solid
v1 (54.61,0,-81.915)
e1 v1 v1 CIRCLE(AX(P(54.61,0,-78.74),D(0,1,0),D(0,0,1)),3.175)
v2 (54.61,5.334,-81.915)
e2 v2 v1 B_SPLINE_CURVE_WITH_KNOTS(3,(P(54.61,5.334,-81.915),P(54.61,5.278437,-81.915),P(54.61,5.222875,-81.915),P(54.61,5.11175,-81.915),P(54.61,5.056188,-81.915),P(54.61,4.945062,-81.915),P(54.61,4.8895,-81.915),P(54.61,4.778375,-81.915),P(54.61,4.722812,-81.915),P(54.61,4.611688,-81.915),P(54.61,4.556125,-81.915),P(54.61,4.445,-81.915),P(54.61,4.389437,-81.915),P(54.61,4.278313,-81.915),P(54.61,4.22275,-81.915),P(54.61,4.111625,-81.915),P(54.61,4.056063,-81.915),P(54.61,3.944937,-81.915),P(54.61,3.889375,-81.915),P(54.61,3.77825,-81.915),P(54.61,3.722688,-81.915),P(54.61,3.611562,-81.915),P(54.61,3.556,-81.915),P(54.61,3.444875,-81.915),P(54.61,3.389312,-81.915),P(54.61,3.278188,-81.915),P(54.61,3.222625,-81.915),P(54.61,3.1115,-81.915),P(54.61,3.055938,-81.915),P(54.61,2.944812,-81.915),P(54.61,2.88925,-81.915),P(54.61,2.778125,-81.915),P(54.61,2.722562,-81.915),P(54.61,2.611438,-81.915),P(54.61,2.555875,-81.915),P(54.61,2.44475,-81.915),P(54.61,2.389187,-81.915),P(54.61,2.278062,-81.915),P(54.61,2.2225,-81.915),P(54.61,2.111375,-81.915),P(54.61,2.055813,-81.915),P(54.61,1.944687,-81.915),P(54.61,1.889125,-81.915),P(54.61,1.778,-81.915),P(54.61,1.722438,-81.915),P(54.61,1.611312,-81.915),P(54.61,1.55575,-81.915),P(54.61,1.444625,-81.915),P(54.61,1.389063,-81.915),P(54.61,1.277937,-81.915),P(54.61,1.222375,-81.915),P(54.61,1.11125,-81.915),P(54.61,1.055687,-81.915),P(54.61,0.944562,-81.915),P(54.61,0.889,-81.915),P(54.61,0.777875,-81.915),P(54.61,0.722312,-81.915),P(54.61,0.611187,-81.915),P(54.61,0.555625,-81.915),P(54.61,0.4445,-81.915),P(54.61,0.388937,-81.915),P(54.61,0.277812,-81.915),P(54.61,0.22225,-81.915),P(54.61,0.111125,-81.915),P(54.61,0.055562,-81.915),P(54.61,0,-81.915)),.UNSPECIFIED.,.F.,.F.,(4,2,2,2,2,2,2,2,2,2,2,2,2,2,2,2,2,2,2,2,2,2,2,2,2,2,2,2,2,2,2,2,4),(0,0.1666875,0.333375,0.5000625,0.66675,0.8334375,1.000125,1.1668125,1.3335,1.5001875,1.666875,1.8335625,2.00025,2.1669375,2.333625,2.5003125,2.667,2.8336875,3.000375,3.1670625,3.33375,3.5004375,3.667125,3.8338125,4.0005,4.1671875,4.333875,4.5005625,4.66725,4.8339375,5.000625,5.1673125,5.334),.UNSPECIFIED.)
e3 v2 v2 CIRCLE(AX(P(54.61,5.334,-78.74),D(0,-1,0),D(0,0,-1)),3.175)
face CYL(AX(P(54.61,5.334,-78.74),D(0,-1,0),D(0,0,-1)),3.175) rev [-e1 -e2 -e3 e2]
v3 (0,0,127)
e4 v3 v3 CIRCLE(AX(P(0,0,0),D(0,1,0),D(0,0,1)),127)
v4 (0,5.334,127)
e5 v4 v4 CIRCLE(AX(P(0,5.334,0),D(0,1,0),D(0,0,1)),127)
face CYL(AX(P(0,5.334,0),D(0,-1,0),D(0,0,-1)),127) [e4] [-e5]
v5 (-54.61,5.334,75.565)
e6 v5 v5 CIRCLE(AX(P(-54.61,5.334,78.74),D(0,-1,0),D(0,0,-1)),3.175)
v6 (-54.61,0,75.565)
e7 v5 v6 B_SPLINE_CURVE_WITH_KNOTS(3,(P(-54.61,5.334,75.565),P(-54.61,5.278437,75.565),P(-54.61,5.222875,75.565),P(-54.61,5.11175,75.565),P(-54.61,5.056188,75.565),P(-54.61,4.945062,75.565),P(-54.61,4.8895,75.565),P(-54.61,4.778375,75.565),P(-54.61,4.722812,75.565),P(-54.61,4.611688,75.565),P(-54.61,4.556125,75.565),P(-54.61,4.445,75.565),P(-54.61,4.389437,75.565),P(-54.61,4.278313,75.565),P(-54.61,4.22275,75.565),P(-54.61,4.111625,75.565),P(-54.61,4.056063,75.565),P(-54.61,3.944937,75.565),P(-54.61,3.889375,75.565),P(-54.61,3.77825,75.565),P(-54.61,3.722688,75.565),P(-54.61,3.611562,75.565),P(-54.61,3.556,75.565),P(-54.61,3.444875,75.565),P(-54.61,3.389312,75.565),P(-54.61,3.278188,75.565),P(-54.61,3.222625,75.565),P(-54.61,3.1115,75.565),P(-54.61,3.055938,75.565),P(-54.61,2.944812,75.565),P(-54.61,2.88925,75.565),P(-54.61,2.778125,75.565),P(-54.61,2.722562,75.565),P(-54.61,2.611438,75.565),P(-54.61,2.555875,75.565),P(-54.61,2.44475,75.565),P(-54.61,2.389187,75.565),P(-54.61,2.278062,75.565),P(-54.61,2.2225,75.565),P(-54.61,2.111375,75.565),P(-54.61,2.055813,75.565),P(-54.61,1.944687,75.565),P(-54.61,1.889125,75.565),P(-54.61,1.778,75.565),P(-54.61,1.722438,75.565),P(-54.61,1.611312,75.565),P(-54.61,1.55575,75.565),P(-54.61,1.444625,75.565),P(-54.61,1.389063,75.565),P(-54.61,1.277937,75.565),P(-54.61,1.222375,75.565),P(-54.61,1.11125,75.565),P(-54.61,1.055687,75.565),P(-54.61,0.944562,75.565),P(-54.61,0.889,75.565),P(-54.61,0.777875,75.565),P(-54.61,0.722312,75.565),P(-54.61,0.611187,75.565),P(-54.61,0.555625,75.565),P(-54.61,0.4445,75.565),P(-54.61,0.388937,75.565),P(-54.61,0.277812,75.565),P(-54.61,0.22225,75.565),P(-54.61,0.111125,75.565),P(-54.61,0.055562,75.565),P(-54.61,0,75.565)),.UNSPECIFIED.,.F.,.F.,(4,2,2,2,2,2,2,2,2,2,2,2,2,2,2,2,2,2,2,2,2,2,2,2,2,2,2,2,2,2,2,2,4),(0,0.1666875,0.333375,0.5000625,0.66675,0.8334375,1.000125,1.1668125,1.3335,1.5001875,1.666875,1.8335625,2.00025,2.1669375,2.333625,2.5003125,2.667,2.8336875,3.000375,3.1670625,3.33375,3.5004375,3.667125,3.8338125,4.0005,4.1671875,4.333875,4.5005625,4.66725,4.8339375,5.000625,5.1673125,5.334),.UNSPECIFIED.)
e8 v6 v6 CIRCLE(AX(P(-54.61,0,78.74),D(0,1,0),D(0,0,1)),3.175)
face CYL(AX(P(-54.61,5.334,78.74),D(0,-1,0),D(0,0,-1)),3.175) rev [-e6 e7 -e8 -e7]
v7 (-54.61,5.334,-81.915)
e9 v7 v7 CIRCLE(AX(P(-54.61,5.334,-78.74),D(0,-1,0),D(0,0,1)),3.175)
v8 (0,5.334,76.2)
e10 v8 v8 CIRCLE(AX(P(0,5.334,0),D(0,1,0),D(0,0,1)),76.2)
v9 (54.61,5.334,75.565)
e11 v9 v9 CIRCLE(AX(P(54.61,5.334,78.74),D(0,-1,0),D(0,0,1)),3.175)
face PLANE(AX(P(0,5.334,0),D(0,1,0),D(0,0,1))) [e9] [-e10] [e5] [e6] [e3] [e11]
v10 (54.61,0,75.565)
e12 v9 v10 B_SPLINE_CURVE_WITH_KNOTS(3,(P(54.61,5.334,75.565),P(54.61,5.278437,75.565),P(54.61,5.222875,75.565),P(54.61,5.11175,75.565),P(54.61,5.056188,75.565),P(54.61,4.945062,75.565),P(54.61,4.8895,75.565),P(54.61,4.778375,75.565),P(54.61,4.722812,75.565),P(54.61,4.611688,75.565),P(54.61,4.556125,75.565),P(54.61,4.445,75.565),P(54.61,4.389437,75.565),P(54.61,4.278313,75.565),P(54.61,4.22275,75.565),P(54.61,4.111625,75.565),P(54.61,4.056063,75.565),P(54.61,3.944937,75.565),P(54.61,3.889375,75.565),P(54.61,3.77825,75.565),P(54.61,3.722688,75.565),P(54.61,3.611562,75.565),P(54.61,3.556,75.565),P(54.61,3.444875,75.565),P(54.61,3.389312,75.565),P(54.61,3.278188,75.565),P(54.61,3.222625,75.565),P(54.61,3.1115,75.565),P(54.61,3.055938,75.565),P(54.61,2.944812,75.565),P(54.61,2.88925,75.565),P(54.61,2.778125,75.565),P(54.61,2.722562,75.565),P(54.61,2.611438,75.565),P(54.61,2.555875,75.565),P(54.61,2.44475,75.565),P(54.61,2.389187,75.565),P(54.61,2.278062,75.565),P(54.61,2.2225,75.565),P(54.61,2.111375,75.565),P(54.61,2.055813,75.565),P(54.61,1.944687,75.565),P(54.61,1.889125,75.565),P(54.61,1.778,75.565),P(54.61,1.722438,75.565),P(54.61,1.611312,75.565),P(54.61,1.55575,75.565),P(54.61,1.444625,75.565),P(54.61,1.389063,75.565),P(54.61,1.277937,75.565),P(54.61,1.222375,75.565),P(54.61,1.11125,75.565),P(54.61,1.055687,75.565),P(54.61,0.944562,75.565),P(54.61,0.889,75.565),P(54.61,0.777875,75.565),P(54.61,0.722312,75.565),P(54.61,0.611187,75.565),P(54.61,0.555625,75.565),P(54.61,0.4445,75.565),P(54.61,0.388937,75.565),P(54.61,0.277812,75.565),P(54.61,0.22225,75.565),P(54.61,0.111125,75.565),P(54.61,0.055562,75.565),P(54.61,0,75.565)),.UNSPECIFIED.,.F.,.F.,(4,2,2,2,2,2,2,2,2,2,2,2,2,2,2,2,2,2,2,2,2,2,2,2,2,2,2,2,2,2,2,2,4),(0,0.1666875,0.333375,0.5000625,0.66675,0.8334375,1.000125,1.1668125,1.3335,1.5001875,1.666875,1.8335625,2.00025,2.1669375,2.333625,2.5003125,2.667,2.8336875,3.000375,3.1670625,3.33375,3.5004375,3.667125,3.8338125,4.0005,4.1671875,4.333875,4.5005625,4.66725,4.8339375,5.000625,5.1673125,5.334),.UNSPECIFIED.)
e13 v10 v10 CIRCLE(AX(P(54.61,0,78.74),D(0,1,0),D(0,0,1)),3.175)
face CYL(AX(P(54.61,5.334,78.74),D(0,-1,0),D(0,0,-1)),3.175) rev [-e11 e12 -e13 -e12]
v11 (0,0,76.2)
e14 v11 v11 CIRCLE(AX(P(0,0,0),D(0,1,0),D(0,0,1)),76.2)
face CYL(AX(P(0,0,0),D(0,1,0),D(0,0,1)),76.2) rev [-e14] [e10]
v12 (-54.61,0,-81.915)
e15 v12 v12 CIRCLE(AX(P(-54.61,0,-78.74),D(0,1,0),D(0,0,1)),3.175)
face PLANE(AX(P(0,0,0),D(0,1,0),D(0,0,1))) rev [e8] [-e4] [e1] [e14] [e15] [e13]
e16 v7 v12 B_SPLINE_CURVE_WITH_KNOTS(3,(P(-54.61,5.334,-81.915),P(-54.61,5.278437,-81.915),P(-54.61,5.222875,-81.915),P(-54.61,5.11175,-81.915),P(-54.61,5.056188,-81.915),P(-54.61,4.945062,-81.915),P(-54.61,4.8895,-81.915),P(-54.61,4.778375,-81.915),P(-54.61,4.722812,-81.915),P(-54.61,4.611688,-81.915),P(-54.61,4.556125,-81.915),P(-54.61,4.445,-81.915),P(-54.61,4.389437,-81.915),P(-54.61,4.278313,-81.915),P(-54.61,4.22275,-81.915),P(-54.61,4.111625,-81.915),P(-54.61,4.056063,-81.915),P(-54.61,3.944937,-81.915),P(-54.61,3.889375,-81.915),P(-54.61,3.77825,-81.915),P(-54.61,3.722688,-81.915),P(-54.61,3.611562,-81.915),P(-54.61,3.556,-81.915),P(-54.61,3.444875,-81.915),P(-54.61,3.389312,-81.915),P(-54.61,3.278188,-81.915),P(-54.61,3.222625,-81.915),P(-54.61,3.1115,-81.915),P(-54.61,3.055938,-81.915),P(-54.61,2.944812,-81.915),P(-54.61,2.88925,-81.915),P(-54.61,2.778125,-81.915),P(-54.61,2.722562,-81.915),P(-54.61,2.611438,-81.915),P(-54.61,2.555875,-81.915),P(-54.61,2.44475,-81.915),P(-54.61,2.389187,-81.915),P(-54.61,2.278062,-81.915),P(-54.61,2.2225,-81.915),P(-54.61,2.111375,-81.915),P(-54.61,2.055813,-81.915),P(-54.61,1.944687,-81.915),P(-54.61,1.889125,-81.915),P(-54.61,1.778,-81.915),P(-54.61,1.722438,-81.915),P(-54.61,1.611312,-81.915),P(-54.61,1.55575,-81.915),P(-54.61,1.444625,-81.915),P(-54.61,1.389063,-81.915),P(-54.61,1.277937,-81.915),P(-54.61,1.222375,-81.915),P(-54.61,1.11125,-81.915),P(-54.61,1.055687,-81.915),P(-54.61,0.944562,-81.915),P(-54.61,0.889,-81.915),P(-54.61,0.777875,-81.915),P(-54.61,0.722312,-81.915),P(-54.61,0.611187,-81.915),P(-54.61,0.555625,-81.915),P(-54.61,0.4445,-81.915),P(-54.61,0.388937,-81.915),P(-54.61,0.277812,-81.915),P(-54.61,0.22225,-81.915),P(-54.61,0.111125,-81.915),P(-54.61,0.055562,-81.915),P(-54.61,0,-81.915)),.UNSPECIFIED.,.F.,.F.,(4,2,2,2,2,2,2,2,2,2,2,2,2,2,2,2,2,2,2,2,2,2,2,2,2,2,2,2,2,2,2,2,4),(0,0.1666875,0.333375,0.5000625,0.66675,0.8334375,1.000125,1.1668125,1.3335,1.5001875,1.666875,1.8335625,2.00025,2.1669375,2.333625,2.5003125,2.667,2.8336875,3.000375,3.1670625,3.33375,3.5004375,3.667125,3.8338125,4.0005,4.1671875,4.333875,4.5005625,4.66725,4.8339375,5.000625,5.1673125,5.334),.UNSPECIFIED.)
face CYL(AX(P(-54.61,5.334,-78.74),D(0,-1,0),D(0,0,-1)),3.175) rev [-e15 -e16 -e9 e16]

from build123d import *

# Parameters (mm, degrees)
SKETCH1_R          = 127
BASE_DEPTH         = 5.334
SKETCH2_R          = 76.2
CUT_EXTRUDE1_DEPTH = 180.684310823
HOLE2_OUTLINE_R    = 3.175
HOLE2_DEPTH        = 5.334


# Read off the part's stored shape, not the designer's step: Hole2
with BuildPart() as part:
    # Sketch1 → Base (new body)
    with BuildSketch(Plane(origin=(0, 0, 0), x_dir=(1, 0, 0), z_dir=(0, 1, 0))):
        with Locations(Location((0, 0, 0), (0, 0, 270))):
            Circle(SKETCH1_R)
    extrude(amount=BASE_DEPTH)

    # Sketch2 → Cut-Extrude1 (cut, through all)
    with BuildSketch(Plane(origin=(0, 5.334, 0), x_dir=(1, 0, 0), z_dir=(0, 1, 0))):
        with Locations(Location((0, 0, 0), (0, 0, 270))):
            Circle(SKETCH2_R)
    extrude(amount=-CUT_EXTRUDE1_DEPTH, mode=Mode.SUBTRACT)

    # Hole2 outline → Hole2 (cut)
    with BuildSketch(Plane(origin=(0, 0, 0), x_dir=(1, 0, 0), z_dir=(0, 1, 0))):
        with Locations((-54.61, -78.74)):
            Circle(HOLE2_OUTLINE_R)
        with Locations((54.61, -78.74)):
            Circle(HOLE2_OUTLINE_R)
        with Locations((54.61, 78.74)):
            Circle(HOLE2_OUTLINE_R)
        with Locations((-54.61, 78.74)):
            Circle(HOLE2_OUTLINE_R)
    extrude(amount=HOLE2_DEPTH, mode=Mode.SUBTRACT)


solid = part.part
